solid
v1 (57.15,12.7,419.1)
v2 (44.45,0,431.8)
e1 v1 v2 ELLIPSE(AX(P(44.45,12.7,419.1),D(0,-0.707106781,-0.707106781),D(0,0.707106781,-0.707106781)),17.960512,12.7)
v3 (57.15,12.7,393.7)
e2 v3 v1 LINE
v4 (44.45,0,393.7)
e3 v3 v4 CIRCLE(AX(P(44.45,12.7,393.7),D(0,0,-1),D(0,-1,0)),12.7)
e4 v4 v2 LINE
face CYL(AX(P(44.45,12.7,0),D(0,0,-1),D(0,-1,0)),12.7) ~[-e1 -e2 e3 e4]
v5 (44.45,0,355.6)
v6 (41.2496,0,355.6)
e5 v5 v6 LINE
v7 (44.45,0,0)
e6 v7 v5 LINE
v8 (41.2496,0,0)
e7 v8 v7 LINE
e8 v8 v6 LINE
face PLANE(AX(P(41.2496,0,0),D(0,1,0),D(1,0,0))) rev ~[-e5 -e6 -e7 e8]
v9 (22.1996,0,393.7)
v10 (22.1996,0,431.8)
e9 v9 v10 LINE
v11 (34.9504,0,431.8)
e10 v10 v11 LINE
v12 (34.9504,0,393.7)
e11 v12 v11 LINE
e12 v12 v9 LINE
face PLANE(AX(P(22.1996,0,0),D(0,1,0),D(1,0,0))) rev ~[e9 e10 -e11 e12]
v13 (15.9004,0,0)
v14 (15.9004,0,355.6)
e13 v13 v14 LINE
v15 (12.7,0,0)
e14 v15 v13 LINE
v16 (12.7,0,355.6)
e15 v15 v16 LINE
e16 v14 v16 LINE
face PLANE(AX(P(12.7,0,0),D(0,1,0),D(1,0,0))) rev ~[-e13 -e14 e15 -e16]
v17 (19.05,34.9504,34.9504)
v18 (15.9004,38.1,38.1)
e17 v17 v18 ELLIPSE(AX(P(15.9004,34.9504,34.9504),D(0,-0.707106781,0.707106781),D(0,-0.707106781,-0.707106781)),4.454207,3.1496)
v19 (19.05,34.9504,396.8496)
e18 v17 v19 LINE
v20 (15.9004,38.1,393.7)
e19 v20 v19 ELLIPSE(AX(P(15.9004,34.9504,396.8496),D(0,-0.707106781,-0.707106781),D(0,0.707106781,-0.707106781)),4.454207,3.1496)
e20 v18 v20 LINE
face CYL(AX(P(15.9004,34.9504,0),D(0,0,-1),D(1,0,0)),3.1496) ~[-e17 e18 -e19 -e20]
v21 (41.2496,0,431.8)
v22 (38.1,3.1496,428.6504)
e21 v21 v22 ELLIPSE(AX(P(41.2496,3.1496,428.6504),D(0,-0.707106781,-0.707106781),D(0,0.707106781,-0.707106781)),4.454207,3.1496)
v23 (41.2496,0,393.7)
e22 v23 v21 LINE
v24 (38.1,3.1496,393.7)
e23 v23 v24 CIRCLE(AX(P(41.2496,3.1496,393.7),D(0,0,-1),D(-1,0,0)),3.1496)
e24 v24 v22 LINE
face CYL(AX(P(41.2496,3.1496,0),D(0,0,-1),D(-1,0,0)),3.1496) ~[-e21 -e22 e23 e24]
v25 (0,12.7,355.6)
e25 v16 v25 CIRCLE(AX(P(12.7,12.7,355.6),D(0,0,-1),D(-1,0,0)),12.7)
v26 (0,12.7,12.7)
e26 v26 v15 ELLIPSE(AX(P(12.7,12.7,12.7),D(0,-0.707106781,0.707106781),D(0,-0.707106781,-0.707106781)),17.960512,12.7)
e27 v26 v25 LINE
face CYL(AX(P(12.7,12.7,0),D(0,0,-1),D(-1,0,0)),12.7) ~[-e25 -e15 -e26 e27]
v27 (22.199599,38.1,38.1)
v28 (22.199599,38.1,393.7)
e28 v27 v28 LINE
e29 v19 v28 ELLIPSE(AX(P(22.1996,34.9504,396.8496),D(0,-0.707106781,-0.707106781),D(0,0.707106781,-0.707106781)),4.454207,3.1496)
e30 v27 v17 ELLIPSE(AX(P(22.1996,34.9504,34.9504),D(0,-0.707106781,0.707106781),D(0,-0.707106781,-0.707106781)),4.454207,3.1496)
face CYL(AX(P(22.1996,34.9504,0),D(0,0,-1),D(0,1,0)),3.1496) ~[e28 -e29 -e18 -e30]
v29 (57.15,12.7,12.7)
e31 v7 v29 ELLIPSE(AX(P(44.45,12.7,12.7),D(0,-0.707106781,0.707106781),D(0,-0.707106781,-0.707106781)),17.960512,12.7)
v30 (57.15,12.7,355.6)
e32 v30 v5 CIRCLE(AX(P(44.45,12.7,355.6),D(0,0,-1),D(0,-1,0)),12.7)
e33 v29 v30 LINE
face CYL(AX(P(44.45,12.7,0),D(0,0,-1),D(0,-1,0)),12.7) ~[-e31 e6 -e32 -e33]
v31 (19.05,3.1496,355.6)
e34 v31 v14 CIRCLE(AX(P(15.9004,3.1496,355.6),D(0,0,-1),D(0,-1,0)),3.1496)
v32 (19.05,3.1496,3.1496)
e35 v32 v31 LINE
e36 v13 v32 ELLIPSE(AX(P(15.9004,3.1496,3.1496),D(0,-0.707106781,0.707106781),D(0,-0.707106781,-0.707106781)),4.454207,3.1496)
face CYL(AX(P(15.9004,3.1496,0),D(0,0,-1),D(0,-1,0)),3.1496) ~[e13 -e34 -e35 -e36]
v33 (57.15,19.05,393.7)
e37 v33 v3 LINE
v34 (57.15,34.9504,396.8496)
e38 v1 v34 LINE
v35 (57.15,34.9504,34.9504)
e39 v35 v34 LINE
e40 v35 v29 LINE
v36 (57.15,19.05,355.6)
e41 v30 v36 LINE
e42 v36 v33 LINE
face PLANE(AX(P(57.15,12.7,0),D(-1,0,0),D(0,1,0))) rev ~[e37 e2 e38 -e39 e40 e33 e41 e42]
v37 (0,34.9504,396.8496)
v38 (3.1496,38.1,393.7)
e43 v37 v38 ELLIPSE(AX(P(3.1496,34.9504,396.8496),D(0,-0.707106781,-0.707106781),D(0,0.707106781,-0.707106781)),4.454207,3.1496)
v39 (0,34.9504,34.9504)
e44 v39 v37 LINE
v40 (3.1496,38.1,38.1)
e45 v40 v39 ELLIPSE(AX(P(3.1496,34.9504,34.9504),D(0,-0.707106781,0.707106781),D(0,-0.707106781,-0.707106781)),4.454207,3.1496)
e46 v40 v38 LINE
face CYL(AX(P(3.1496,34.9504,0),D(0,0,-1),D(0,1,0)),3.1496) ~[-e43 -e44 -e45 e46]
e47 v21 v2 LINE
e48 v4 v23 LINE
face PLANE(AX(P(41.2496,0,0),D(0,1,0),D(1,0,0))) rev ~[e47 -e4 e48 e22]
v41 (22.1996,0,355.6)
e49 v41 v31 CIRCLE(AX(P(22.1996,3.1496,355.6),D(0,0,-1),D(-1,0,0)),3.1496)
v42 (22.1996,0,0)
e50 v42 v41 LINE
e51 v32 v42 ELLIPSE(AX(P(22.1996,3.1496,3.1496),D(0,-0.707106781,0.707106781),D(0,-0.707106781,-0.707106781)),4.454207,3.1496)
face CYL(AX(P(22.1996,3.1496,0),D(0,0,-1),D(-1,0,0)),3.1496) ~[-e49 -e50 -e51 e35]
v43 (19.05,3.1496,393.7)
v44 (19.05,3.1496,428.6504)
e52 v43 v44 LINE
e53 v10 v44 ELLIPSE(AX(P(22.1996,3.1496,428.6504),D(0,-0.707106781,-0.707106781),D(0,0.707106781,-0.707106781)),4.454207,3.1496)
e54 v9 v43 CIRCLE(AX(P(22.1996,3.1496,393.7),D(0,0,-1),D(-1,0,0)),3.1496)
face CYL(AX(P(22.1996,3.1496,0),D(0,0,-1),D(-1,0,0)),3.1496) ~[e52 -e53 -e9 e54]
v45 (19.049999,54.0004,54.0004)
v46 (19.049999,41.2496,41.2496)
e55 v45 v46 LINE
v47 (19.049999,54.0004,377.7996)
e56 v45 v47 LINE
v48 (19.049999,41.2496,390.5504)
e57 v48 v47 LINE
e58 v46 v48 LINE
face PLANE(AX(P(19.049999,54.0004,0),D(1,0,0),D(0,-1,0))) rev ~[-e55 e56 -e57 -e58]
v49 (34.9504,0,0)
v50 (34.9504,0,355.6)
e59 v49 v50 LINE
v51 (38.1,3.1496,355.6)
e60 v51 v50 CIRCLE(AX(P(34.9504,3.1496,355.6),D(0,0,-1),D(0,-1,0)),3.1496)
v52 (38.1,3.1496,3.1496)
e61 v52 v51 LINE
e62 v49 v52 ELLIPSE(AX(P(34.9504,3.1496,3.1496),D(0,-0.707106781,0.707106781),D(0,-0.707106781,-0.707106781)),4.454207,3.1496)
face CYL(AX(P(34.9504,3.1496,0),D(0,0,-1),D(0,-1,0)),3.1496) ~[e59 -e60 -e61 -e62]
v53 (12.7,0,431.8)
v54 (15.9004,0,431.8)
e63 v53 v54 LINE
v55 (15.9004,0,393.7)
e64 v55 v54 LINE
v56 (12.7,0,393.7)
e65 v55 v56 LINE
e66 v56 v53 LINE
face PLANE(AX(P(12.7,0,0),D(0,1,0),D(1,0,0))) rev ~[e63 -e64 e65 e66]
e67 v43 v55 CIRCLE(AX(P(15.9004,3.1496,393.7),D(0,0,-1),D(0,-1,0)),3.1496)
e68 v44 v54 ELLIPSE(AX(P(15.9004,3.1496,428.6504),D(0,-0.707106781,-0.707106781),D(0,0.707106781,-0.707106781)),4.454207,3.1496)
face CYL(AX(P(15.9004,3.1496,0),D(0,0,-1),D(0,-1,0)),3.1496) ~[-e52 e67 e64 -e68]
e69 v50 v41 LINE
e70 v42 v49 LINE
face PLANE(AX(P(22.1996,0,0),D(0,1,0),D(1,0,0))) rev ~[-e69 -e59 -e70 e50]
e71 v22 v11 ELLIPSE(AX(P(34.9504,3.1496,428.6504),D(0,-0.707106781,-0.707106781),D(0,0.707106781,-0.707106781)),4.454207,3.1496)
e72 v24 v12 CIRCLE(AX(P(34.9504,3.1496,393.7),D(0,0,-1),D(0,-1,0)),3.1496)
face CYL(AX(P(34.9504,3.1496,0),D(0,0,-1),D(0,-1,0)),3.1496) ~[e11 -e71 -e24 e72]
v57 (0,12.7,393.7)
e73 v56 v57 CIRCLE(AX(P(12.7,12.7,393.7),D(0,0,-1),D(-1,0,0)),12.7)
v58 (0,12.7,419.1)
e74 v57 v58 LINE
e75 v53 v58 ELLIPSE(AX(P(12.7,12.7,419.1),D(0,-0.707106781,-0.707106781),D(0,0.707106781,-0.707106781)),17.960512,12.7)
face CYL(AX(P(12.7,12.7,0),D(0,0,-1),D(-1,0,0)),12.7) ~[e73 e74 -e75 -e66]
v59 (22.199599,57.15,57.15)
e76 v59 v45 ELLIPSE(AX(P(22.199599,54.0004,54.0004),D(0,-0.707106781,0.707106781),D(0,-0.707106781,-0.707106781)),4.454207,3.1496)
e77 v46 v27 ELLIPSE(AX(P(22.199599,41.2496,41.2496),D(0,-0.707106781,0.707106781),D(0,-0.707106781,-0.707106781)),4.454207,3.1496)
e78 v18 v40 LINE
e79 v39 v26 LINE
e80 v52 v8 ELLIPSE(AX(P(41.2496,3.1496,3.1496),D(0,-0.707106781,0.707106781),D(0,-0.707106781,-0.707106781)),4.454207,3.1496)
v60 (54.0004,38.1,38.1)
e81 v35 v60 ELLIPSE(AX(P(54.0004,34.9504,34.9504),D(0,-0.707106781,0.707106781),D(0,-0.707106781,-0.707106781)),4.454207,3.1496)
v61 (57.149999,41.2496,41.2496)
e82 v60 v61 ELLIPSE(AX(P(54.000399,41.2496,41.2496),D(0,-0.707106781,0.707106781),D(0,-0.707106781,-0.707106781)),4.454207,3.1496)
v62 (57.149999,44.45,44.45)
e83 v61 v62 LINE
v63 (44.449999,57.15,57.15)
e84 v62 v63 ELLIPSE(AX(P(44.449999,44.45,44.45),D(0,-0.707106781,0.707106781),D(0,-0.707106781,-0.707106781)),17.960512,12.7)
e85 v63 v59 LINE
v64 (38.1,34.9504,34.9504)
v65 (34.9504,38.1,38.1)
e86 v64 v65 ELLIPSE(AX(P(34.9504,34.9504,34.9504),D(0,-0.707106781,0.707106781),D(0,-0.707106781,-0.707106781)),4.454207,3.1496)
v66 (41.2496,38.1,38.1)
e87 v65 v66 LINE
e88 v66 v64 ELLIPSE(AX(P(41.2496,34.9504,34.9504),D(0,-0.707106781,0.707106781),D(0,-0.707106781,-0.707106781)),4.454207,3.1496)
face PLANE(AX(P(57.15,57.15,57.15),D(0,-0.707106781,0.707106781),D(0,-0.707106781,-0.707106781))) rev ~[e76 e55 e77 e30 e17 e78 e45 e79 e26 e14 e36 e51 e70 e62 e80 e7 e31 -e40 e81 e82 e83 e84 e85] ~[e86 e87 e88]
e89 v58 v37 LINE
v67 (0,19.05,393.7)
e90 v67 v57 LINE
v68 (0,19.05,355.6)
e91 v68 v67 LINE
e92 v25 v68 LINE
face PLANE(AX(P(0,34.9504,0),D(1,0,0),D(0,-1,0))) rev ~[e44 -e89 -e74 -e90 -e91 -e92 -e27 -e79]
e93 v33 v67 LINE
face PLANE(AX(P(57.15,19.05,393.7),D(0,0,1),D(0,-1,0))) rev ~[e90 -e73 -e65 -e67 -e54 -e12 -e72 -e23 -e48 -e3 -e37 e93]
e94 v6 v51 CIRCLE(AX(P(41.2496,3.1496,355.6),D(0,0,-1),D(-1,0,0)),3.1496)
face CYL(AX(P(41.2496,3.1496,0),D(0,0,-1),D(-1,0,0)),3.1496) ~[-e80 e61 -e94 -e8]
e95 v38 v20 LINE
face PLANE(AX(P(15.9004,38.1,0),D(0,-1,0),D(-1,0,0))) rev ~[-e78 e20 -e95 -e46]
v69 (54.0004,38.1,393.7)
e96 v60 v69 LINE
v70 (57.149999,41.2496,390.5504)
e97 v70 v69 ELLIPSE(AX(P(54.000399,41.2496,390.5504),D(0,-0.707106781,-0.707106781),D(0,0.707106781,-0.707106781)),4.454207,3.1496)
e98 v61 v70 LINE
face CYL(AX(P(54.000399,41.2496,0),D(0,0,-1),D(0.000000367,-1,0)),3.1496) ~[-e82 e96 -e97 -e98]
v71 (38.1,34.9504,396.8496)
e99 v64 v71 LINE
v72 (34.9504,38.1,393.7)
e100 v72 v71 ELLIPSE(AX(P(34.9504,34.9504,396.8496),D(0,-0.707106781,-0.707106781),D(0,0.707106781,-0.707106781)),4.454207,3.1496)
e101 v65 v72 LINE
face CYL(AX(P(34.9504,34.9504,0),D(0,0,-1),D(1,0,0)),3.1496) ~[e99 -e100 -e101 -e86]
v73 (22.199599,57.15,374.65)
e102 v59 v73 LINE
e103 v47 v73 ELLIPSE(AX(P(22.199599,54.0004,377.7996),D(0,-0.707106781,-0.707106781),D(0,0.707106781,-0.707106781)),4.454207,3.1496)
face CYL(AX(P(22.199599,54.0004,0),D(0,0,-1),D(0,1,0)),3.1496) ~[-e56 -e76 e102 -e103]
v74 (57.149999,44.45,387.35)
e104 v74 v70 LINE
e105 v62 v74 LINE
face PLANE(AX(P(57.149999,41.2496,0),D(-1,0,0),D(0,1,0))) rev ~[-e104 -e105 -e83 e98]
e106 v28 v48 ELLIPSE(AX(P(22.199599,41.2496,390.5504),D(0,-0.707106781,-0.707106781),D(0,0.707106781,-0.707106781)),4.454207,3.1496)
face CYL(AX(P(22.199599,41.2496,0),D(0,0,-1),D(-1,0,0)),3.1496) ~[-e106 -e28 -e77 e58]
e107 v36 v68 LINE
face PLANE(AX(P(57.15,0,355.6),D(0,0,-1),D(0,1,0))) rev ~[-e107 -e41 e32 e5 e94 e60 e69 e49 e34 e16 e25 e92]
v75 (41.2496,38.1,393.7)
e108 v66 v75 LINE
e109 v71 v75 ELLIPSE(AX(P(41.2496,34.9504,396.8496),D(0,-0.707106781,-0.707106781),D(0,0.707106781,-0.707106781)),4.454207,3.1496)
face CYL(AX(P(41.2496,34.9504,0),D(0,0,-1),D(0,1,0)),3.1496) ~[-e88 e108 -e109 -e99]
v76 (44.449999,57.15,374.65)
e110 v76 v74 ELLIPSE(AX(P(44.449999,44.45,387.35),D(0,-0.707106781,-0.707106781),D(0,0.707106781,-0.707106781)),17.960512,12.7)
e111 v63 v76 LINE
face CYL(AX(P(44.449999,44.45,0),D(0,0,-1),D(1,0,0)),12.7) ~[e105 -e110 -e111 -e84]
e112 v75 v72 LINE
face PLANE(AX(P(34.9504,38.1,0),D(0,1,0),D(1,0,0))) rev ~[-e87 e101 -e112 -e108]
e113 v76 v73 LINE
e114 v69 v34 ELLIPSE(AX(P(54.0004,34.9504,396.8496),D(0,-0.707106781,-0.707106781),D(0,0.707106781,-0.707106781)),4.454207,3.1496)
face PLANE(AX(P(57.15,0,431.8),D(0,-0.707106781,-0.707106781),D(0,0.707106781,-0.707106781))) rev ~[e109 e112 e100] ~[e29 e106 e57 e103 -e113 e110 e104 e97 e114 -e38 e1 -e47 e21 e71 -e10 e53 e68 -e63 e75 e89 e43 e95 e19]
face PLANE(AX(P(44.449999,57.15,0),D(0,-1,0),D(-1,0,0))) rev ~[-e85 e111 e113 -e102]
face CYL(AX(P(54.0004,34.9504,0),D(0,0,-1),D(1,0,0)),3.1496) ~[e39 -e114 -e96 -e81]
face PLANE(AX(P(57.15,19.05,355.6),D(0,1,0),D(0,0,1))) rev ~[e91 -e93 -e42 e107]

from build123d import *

# Parameters (mm, degrees)
F1_DEPTH = 431.8
F3_DEPTH = 57.151
F4_W     = 12.7
F4_H     = 38.1
F4_W_2   = 6.35
F5_DEPTH = 57.151


# Not quite as in the source:
# - ends of sketch curves that miss each other by under 0.0002 mm in the source are joined


with BuildPart() as f1:
    # F0 (on Top) → F1 (new body)
    with BuildSketch(Plane.XY):
        with BuildLine():
            ThreePointArc((0, 12.7), (3.7197438789, 3.7197438789), (12.7, 0))
            Line((12.7, 0), (15.9004, 0))
            ThreePointArc((15.9004, 0), (18.127503518, 0.922496482), (19.05, 3.1496))
            Line((19.05, 3.1496), (19.05, 34.9504))
            ThreePointArc((19.05, 34.9504), (18.127503518, 37.177503518), (15.9004, 38.1))
            Line((15.9004, 38.1), (3.1496, 38.1))
            ThreePointArc((3.1496, 38.1), (0.922496482, 37.177503518), (0, 34.9504))
            Line((0, 34.9504), (0, 12.7))
        make_face()
        with BuildLine():
            Line((19.05, 34.9504), (19.05, 3.1496))
            ThreePointArc((19.05, 3.1496), (19.972496482, 0.922496482), (22.1996, 0))
            Line((22.1996, 0), (34.9504, 0))
            ThreePointArc((34.9504, 0), (37.177503518, 0.922496482), (38.1, 3.1496))
            Line((38.1, 3.1496), (38.1, 34.9504))
            ThreePointArc((38.1, 34.9504), (37.177503518, 37.177503518), (34.9504, 38.1))
            Line((34.9504, 38.1), (22.1996, 38.1))
            ThreePointArc((22.1996, 38.1), (19.972496482, 37.177503518), (19.05, 34.9504))
        make_face()
        with BuildLine():
            Line((38.1, 34.9504), (38.1, 3.1496))
            ThreePointArc((38.1, 3.1496), (39.022496482, 0.922496482), (41.2496, 0))
            Line((41.2496, 0), (44.45, 0))
            ThreePointArc((44.45, 0), (53.4302561211, 3.7197438789), (57.15, 12.7))
            Line((57.15, 12.7), (57.15, 34.9504))
            ThreePointArc((57.15, 34.9504), (56.227503518, 37.177503518), (54.0004, 38.1))
            Line((54.0004, 38.1), (41.2496, 38.1))
            ThreePointArc((41.2496, 38.1), (39.022496482, 37.177503518), (38.1, 34.9504))
        make_face()
        with BuildLine():
            ThreePointArc((19.0499988437, 41.2496), (19.9724953256, 39.022496482), (22.1995988437, 38.1))
            Line((22.1995988437, 38.1), (34.9504, 38.1))
            Line((34.9504, 38.1), (41.2496, 38.1))
            Line((41.2496, 38.1), (54.0004, 38.1))
            ThreePointArc((54.0004, 38.1), (56.2275023617, 39.022496482), (57.1499988437, 41.2496))
            Line((57.1499988437, 41.2496), (57.1499988437, 44.45))
            ThreePointArc((57.1499988437, 44.45), (53.4302549647, 53.4302561211), (44.4499988437, 57.15))
            Line((44.4499988437, 57.15), (22.1995988437, 57.15))
            ThreePointArc((22.1995988437, 57.15), (19.9724953256, 56.227503518), (19.0499988437, 54.0004))
            Line((19.0499988437, 54.0004), (19.0499988437, 41.2496))
        make_face()
    extrude(amount=F1_DEPTH)

    # F2 (on face) → F3 (cut, through all)
    with BuildSketch(Plane.YZ.offset(57.15)):
        Polygon((57.15, 0), (57.15, 57.15), (0, 0), (12.7, 0), align=None)
        Polygon((12.7, 431.8), (0, 431.8), (57.15, 374.65), (57.15, 431.8), align=None)
    extrude(amount=-F3_DEPTH, mode=Mode.SUBTRACT)

    # F4 (on face) → F5 (cut, through all)
    with BuildSketch(Plane.YZ.offset(57.15)):
        with Locations((6.35, 374.65)):
            Rectangle(F4_W, F4_H)
        with Locations((15.875, 374.65)):
            Rectangle(F4_W_2, F4_H)
    extrude(amount=-F5_DEPTH, mode=Mode.SUBTRACT)


solid = f1.part
